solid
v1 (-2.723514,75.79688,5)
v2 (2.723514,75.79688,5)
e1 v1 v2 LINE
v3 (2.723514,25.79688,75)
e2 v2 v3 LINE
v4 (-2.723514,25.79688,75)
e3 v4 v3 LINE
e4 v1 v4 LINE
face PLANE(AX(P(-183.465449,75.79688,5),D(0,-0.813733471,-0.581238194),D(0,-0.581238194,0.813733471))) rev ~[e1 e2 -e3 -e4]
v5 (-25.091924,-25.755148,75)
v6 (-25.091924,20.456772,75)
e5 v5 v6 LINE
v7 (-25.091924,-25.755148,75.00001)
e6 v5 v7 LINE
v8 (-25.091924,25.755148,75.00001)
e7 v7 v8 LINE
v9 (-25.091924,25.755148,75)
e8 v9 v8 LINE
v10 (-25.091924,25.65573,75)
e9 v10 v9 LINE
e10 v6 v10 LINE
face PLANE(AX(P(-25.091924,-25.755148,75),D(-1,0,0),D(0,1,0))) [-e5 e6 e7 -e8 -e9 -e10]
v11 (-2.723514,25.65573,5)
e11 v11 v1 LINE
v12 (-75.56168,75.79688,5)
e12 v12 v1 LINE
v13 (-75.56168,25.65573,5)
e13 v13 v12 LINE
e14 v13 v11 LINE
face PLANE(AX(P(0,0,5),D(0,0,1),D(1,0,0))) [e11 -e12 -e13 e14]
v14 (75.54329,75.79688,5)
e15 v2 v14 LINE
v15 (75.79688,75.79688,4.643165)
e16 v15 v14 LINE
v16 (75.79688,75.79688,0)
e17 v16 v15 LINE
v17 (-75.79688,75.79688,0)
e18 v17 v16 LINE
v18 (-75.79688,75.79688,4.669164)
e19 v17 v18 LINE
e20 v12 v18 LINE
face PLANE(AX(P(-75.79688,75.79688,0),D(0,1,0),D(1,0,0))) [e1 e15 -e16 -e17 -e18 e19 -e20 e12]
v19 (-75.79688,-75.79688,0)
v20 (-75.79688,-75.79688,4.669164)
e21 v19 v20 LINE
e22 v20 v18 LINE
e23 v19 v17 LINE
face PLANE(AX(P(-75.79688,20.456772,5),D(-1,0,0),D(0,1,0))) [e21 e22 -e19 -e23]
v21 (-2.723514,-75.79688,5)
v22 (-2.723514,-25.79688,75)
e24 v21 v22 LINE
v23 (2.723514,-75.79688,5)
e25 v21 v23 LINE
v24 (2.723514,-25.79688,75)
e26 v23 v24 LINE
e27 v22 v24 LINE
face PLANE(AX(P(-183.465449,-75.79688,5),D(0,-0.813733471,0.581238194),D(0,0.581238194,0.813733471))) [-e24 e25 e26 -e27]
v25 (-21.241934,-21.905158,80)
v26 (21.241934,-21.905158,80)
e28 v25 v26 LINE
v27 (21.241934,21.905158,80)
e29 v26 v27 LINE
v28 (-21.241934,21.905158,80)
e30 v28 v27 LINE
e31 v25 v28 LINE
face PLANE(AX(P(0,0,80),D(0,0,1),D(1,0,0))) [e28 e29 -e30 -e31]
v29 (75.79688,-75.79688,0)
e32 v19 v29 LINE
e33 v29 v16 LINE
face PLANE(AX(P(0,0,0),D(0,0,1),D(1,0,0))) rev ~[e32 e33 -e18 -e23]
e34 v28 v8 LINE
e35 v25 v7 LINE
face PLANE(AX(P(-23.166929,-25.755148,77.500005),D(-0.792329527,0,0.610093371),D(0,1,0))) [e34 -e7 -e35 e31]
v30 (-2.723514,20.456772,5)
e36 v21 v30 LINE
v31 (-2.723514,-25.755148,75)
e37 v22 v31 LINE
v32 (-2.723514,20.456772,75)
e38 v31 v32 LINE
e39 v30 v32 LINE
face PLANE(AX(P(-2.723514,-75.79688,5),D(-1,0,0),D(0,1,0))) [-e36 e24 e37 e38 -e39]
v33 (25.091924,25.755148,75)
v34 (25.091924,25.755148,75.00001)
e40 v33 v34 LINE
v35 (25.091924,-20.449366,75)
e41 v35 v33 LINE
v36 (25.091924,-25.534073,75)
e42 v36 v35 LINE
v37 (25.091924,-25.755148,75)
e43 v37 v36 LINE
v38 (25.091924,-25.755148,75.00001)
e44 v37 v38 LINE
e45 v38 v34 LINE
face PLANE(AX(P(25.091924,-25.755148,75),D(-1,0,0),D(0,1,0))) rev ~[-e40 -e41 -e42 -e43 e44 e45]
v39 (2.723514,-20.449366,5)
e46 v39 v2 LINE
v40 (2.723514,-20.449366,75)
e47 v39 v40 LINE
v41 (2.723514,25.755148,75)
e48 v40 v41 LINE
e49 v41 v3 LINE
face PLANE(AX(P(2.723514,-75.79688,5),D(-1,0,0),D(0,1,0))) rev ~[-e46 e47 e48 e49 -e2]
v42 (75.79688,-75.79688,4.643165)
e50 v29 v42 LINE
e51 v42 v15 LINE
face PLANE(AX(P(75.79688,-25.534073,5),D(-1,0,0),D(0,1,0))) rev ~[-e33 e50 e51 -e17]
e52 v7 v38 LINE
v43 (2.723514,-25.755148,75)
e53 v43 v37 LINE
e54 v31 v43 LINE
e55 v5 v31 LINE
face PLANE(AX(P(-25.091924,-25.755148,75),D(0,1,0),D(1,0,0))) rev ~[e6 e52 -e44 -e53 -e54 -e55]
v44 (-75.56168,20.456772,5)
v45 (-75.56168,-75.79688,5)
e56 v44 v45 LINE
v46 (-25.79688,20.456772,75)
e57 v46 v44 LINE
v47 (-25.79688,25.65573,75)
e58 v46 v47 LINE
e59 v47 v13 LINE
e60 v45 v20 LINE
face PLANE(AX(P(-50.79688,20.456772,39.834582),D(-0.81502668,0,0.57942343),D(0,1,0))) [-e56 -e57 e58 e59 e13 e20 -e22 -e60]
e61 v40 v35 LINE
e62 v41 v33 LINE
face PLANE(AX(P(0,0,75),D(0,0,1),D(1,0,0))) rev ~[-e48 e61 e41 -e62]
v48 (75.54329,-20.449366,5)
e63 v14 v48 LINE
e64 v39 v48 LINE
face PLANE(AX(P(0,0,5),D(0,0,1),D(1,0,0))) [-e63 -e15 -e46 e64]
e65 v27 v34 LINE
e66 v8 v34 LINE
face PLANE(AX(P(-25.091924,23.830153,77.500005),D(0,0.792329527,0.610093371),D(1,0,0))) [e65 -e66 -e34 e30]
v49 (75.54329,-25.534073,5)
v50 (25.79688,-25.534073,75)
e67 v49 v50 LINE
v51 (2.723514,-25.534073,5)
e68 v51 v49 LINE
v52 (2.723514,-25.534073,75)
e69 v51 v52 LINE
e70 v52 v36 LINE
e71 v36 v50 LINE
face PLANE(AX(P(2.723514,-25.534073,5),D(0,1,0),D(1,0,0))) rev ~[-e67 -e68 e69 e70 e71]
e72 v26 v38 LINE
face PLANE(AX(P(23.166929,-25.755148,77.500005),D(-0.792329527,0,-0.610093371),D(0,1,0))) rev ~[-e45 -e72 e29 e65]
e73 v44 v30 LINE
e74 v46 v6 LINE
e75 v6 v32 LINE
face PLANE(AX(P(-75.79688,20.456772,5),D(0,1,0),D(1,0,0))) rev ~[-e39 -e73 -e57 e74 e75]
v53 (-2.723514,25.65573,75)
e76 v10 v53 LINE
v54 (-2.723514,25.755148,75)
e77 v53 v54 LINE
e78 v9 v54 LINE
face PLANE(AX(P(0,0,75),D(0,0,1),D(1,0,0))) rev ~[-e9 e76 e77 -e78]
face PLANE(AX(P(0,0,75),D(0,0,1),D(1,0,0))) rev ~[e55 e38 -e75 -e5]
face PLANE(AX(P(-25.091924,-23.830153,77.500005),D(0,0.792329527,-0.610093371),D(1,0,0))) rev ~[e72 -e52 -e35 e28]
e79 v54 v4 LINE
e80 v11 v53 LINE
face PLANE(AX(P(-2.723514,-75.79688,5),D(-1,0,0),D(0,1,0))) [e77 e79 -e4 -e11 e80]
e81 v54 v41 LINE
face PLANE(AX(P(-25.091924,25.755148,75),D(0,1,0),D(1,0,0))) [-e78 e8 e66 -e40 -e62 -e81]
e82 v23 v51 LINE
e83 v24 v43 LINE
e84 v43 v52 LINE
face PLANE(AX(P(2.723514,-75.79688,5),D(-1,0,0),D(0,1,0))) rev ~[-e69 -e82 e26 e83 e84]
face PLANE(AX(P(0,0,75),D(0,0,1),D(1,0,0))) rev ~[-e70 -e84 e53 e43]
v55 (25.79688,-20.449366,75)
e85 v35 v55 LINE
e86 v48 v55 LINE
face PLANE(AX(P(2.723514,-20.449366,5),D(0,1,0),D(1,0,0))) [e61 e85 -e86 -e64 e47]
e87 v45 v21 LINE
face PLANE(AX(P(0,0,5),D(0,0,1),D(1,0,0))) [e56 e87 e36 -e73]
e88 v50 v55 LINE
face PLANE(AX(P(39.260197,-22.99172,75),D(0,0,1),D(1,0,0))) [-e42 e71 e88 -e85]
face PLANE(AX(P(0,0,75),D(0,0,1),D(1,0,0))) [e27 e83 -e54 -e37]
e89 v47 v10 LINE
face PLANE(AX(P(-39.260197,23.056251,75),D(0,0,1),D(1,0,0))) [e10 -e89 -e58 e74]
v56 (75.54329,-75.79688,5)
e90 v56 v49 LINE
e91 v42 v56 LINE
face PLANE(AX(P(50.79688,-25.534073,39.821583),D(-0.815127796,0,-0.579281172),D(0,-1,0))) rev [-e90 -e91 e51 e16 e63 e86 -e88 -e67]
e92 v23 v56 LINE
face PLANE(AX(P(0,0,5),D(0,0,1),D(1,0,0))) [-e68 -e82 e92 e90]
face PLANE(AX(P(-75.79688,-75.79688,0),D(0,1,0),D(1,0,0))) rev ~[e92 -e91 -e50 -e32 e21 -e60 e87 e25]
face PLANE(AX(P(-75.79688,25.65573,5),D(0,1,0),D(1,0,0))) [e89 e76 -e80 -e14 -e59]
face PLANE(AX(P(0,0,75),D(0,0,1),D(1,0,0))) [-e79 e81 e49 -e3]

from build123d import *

# Parameters (mm, degrees)
F0_W        = 151.593759656
F0_H        = 151.593759656
F1_DEPTH    = 5
F2_W        = 5.4470277391
F2_H        = 151.593759656
F3_DEPTH    = 70
F4_T1_DEPTH = 366.9308973901
F5_T1_DEPTH = 366.9308973901
F6_W        = 50.1838475466
F6_H        = 51.510296762
F7_DEPTH    = 5
F8_SIZE2    = 4.99999
F8_SIZE     = 3.84999
F9_W        = 73.0733659584
F9_H        = 5.1989573985
F10_DEPTH   = 70
F11_SIZE2   = 70.3308355562
F11_SIZE    = 50
F12_W       = 73.0733659584
F12_H       = 5.0847064704
F13_DEPTH   = 70
F14_SIZE2   = 50
F14_SIZE    = 70.3568348711


# Not quite as in the source:
# - a fillet or chamfer that OpenCascade refuses, or shapes differently, is made with other operations: its cross-section is extruded or revolved along the edge and cut away or added
# - a fillet or chamfer is up to 0.001 mm smaller than in the source, because OpenCascade refuses the exact size


with BuildPart() as f1:
    # F0 (on Top) → F1 (new body)
    with BuildSketch(Plane.XY):
        Rectangle(F0_W, F0_H)
    extrude(amount=F1_DEPTH)

    # F2 (on face) → F3 (join)
    with BuildSketch(Plane.XY.offset(5)):
        Rectangle(F2_W, F2_H)
    extrude(amount=F3_DEPTH)

    # F4: chamfer of 50 x 70 on 1 edges, made by hand

    # F4_s2 → F4_t1 (cut)
    with BuildSketch(Plane.YZ.offset(-183.465448695)):
        Polygon((-75.796879828, 5), (-25.796879828, 75), (-75.796879828, 75), align=None)
    extrude(amount=F4_T1_DEPTH, mode=Mode.SUBTRACT)

    # F5: chamfer of 70 x 50 on 1 edges, made by hand

    # F5_s2 → F5_t1 (cut)
    with BuildSketch(Plane.YZ.offset(-183.465448695)):
        Polygon((75.796879828, 5), (25.796879828, 75), (75.796879828, 75), align=None)
    extrude(amount=F5_T1_DEPTH, mode=Mode.SUBTRACT)

    # F6 (on face) → F7 (join)
    with BuildSketch(Plane.XY.offset(75)):
        Rectangle(F6_W, F6_H)
    extrude(amount=F7_DEPTH)

    # F8 (size 3.85 and 5 in the source; OpenCascade refuses exactly that, so slightly less here)
    f8_edges = [f1.edges().sort_by_distance(p)[0] for p in [
        (25.091924, 0, 80),
        (0, -25.755148, 80),
        (0, 25.755148, 80),
        (-25.091924, 0, 80),
    ]]
    f8_side = f1.faces().sort_by_distance((0, 0, 80))[0]
    chamfer(f8_edges, length=F8_SIZE, length2=F8_SIZE2, reference=f8_side)

    # F9 (on face) → F10 (join)
    with BuildSketch(Plane.XY.offset(5)):
        with Locations((-39.2601968488, 23.0562509969)):
            Rectangle(F9_W, F9_H)
    extrude(amount=F10_DEPTH)

    # F11
    f11_edges = [f1.edges().sort_by_distance(p)[0] for p in [
        (-75.79688, 23.056251, 75),
    ]]
    f11_side = f1.faces().sort_by_distance((-50.444402, 23.056251, 75))[0]
    chamfer(f11_edges, length=F11_SIZE, length2=F11_SIZE2, reference=f11_side)

    # F12 (on face) → F13 (join)
    with BuildSketch(Plane.XY.offset(5)):
        with Locations((39.2601968488, -22.9917196557)):
            Rectangle(F12_W, F12_H)
    extrude(amount=F13_DEPTH)

    # F14
    f14_edges = [f1.edges().sort_by_distance(p)[0] for p in [
        (75.79688, -22.99172, 75),
    ]]
    f14_side = f1.faces().sort_by_distance((75.79688, -74.105559, 2.5))[0]
    chamfer(f14_edges, length=F14_SIZE, length2=F14_SIZE2, reference=f14_side)


solid = f1.part
